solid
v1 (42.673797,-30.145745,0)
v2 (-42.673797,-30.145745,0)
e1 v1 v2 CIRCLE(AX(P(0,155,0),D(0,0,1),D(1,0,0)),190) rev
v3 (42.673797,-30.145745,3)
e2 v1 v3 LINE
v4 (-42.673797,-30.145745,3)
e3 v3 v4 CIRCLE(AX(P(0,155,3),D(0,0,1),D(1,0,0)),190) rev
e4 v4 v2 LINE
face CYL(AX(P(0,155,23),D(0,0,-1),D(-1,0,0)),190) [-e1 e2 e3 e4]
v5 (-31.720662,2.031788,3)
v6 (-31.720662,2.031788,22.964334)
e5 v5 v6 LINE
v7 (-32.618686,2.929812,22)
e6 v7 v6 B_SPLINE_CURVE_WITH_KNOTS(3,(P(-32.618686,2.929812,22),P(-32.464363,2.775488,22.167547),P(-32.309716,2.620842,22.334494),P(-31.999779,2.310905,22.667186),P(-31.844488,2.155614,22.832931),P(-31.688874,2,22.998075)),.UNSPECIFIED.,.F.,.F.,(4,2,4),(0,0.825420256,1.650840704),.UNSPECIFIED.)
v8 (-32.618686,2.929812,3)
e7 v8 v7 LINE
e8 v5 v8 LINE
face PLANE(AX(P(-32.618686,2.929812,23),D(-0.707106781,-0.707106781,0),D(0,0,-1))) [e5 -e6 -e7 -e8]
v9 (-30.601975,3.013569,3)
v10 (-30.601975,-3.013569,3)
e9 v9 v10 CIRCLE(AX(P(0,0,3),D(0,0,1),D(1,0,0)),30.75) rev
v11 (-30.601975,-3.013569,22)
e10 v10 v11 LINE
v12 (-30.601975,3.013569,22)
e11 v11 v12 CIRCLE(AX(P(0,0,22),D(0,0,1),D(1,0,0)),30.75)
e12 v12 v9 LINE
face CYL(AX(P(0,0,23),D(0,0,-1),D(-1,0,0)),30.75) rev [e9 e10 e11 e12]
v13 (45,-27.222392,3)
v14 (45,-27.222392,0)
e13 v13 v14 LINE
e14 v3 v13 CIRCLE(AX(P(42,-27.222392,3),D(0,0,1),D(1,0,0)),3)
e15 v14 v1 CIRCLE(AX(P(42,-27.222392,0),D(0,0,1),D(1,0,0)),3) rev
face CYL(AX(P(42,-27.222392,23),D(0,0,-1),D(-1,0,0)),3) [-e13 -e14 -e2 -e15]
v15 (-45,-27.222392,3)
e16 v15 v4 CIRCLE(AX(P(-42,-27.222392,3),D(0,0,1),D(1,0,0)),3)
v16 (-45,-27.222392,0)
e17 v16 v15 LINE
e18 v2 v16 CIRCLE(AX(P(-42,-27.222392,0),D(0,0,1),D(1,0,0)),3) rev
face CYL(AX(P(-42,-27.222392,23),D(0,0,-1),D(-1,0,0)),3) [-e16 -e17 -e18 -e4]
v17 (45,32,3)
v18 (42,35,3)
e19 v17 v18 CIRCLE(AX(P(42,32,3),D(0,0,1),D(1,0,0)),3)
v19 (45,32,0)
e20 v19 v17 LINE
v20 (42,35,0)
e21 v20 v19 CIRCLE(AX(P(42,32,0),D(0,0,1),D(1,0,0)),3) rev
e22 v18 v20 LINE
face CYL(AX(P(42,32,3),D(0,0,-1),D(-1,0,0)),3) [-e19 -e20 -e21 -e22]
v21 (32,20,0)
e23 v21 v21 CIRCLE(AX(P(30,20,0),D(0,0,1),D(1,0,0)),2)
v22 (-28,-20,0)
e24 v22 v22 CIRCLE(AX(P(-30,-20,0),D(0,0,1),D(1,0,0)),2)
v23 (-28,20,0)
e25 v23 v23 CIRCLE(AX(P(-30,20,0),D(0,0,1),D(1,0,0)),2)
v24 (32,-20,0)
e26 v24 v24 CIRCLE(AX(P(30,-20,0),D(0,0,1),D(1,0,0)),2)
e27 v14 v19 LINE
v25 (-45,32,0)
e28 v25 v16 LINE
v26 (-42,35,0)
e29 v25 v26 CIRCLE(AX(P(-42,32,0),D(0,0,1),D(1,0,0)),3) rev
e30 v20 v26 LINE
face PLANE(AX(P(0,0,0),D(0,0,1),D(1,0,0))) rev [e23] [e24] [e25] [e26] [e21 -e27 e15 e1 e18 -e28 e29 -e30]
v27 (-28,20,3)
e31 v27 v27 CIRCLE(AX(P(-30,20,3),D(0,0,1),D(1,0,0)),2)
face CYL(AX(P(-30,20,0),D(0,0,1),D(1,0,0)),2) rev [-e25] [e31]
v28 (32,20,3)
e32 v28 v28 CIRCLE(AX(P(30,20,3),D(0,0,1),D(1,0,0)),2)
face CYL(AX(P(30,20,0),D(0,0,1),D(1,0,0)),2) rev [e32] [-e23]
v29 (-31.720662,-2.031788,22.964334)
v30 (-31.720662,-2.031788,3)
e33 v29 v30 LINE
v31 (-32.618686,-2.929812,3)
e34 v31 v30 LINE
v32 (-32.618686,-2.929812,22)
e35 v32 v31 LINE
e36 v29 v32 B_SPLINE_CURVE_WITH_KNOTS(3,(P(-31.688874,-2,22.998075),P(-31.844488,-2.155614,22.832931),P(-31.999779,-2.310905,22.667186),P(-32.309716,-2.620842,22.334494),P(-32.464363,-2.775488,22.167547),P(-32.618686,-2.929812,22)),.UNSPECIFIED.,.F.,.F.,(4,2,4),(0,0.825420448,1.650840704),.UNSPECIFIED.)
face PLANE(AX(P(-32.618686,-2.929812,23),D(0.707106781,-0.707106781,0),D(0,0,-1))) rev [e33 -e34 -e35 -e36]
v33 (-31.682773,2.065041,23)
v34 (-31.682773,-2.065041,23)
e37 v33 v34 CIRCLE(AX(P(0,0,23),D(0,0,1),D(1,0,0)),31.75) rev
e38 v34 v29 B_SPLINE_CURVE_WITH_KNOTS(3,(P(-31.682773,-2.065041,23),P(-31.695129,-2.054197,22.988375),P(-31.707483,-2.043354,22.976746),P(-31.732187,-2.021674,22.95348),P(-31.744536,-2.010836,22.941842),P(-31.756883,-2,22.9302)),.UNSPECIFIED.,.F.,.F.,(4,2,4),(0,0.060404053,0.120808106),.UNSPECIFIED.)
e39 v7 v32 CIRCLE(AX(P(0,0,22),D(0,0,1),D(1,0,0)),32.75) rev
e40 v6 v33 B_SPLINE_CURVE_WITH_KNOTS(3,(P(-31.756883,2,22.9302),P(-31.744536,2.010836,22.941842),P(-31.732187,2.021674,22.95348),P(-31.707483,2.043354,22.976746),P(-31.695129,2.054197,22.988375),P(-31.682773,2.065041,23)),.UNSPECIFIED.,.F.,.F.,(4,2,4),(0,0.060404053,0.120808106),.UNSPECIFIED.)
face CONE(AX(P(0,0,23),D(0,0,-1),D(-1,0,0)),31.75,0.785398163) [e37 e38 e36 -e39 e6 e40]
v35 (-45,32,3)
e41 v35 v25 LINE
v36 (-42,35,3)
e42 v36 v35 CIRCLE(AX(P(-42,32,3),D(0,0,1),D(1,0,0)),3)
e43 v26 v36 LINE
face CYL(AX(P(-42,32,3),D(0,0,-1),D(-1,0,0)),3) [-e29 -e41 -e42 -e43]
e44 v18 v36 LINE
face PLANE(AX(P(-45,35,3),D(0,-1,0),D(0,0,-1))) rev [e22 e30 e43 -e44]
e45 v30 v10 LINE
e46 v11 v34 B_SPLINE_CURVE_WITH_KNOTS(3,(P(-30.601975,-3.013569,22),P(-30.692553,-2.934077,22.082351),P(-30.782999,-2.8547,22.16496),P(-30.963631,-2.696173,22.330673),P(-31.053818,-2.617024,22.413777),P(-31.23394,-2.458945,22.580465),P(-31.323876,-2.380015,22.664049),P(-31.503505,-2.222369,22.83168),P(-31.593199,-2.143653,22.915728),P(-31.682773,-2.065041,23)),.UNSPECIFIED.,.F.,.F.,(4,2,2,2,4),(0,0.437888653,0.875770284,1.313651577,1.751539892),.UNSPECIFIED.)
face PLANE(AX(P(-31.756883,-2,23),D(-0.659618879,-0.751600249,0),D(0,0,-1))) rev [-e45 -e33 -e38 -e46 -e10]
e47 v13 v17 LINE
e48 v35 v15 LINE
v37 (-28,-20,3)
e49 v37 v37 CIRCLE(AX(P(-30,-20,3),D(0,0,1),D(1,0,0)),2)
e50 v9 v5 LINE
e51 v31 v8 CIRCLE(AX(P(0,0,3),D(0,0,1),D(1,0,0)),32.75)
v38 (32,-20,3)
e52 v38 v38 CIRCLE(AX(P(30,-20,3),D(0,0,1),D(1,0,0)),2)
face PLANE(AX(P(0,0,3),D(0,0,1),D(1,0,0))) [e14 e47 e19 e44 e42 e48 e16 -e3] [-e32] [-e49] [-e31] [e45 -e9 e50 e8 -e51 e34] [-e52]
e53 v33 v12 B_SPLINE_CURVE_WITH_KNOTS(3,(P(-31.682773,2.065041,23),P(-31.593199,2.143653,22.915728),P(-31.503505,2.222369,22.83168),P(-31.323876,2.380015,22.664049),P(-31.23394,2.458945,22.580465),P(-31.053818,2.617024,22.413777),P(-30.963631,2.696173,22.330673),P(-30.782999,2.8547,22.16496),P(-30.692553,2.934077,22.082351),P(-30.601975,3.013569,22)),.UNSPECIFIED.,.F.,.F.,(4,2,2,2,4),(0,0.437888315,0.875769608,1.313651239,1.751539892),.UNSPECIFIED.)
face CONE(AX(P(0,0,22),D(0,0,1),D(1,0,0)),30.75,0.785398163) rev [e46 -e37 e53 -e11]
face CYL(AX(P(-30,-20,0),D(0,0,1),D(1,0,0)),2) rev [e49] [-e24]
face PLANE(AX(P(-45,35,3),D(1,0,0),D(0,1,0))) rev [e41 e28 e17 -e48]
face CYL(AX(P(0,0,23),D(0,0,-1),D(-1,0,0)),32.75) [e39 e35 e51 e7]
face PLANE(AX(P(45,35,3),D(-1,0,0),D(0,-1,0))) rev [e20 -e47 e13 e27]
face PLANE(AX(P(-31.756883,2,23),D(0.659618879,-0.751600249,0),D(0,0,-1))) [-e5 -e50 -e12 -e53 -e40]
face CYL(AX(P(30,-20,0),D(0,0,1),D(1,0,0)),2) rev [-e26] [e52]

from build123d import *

# Parameters (mm, degrees)
SKETCH_2_W          = 90
SKETCH_2_H          = 70
EXTRUDE_2_DEPTH     = 3
SKETCH_3_R          = 2
CUT_EXTRUDE_1_DEPTH = 3
SKETCH_4_R          = 32.75
SKETCH_4_R_2        = 30.75
EXTRUDE_3_DEPTH     = 20
SKETCH_5_W          = 3
SKETCH_5_H          = 4
CUT_EXTRUDE_2_DEPTH = 20
CHAMFER_1_SIZE      = 1
CHAMFER_2_SIZE      = 1
CHAMFER_2_SIZE_2    = 1.07199294
FILLET_1_R          = 3
CUT_EXTRUDE_START   = -4
CUT_EXTRUDE_3_DEPTH = 5
FILLET_2_R          = 3


with BuildPart() as part:
    # 草图2 → 凸台-拉伸2 (new body)
    with BuildSketch(Plane.XY):
        Rectangle(SKETCH_2_W, SKETCH_2_H)
    extrude(amount=EXTRUDE_2_DEPTH)

    # 草图3 → 切除-拉伸1 (cut)
    with BuildSketch(Plane.XY.offset(3)):
        with Locations((-30, 20)):
            Circle(SKETCH_3_R)
        with Locations((-30, -20)):
            Circle(SKETCH_3_R)
        with Locations((30, -20)):
            Circle(SKETCH_3_R)
        with Locations((30, 20)):
            Circle(SKETCH_3_R)
    extrude(amount=-CUT_EXTRUDE_1_DEPTH, mode=Mode.SUBTRACT)

    # 草图4 → 凸台-拉伸3 (add)
    with BuildSketch(Plane.XY.offset(3)):
        Circle(SKETCH_4_R)
        Circle(SKETCH_4_R_2, mode=Mode.SUBTRACT)
    extrude(amount=EXTRUDE_3_DEPTH)

    # 草图5 → 切除-拉伸2 (cut)
    with BuildSketch(Plane.XY.offset(23)):
        with Locations((-31.5, 0)):
            Rectangle(SKETCH_5_W, SKETCH_5_H)
    extrude(amount=-CUT_EXTRUDE_2_DEPTH, mode=Mode.SUBTRACT)

    # 倒角1
    chamfer_1_edges = [part.edges().sort_by_distance(p)[0] for p in [
        (1.000466936, -32.734714997, 23),
        (1.000529767, 30.733718294, 23),
    ]]
    chamfer(chamfer_1_edges, length=CHAMFER_1_SIZE - 0.0001)  # a hair under: the kernel refuses the full size

    # 倒角2
    # the kernel refuses this chamfer: 1.07199294, 1, 0.94410674 mm, written as the material it takes off along each edge
    with BuildSketch(Plane(origin=(-32.688874254, -2, 24.571782988), x_dir=(0.07527193503406021, -0.997163043737697, 0), z_dir=(0, 0, -1))) as chamfer_2_piece_1:
        with BuildLine():
            Line((0.932457463, 0), (CHAMFER_2_SIZE * 0.0752719350341, -CHAMFER_2_SIZE * 0.997163043738))
            Line((CHAMFER_2_SIZE * 0.0752719350341, -CHAMFER_2_SIZE * 0.997163043738), (0, 0))
            ThreePointArc((0, 0), (0.479261525, 0.003316189), (0.932457463, 0))
        make_face()
    extrude(amount=21.571782988, mode=Mode.SUBTRACT)
    with BuildSketch(Plane(origin=(-30.684890419, -2, 24.761558832), x_dir=(-1, 0, 0), z_dir=(0, 0, -1))) as chamfer_2_piece_2:
        with BuildLine():
            Line((CHAMFER_2_SIZE_2, 0), (-0.08291501, -1.013569498))
            ThreePointArc((-0.08291501, -1.013569498), (-0.038528119, -0.522494358), (0, 0))
            Line((0, 0), (CHAMFER_2_SIZE_2, 0))
        make_face()
    extrude(amount=21.761558832, mode=Mode.SUBTRACT)
    with BuildSketch(Plane(origin=(-32.688874254, 2, 24.571782988), x_dir=(1, 0, 0), z_dir=(0, 0, -1))) as chamfer_2_piece_3:
        with BuildLine():
            Line((CHAMFER_2_SIZE, 0), (0.070187878, -0.929812122))
            ThreePointArc((0.070187878, -0.929812122), (0.032768161, -0.478151497), (0, 0))
            Line((0, 0), (CHAMFER_2_SIZE, 0))
        make_face()
    extrude(amount=21.571782988, mode=Mode.SUBTRACT)
    with BuildSketch(Plane(origin=(-30.684890419, 2, 24.761558832), x_dir=(0.08153260293948016, 0.9966706751269013, 0), z_dir=(0, 0, -1))) as chamfer_2_piece_4:
        with BuildLine():
            Line((1.016955273, 0), (-CHAMFER_2_SIZE_2 * 0.081532602904, -CHAMFER_2_SIZE_2 * 0.996670674693))
            Line((-CHAMFER_2_SIZE_2 * 0.081532602904, -CHAMFER_2_SIZE_2 * 0.996670674693), (0, 0))
            ThreePointArc((0, 0), (0.523896102, -0.004200479), (1.016955273, 0))
        make_face()
    extrude(amount=21.761558832, mode=Mode.SUBTRACT)

    # 圆角1
    fillet_1_edges = [part.edges().sort_by_distance(p)[0] for p in [
        (-45, 35, 1.5),
        (45, 35, 1.5),
        (45, -35, 1.5),
        (-45, -35, 1.5),
    ]]
    fillet(fillet_1_edges, radius=FILLET_1_R)

    # 切除-拉伸3: read off the stored shape, not the designer's step
    # 切除-拉伸3 outline → 切除-拉伸3 (cut)
    with BuildSketch(Plane.XY.offset(3).offset(CUT_EXTRUDE_START)):
        with BuildLine():
            Line((45, -32), (45, -29.59414942))
            ThreePointArc((45, -29.59414942), (22.661769286, -33.643696457), (-7.97e-07, -35))
            Line((-7.97e-07, -35), (42, -35))
            ThreePointArc((42, -35), (44.121320344, -34.121320344), (45, -32))
        make_face()
        with BuildLine():
            Line((-42, -35), (-7.97e-07, -35))
            ThreePointArc((-7.97e-07, -35), (-22.661770078, -33.643696362), (-45, -29.59414942))
            Line((-45, -29.59414942), (-45, -32))
            ThreePointArc((-45, -32), (-44.121320344, -34.121320344), (-42, -35))
        make_face()
    extrude(amount=CUT_EXTRUDE_3_DEPTH, mode=Mode.SUBTRACT)

    # 圆角2
    fillet_2_edges = [part.edges().sort_by_distance(p)[0] for p in [
        (45, -29.59414942, 1.5),
        (-45, -29.59414942, 1.5),
    ]]
    fillet(fillet_2_edges, radius=FILLET_2_R)


solid = part.part
